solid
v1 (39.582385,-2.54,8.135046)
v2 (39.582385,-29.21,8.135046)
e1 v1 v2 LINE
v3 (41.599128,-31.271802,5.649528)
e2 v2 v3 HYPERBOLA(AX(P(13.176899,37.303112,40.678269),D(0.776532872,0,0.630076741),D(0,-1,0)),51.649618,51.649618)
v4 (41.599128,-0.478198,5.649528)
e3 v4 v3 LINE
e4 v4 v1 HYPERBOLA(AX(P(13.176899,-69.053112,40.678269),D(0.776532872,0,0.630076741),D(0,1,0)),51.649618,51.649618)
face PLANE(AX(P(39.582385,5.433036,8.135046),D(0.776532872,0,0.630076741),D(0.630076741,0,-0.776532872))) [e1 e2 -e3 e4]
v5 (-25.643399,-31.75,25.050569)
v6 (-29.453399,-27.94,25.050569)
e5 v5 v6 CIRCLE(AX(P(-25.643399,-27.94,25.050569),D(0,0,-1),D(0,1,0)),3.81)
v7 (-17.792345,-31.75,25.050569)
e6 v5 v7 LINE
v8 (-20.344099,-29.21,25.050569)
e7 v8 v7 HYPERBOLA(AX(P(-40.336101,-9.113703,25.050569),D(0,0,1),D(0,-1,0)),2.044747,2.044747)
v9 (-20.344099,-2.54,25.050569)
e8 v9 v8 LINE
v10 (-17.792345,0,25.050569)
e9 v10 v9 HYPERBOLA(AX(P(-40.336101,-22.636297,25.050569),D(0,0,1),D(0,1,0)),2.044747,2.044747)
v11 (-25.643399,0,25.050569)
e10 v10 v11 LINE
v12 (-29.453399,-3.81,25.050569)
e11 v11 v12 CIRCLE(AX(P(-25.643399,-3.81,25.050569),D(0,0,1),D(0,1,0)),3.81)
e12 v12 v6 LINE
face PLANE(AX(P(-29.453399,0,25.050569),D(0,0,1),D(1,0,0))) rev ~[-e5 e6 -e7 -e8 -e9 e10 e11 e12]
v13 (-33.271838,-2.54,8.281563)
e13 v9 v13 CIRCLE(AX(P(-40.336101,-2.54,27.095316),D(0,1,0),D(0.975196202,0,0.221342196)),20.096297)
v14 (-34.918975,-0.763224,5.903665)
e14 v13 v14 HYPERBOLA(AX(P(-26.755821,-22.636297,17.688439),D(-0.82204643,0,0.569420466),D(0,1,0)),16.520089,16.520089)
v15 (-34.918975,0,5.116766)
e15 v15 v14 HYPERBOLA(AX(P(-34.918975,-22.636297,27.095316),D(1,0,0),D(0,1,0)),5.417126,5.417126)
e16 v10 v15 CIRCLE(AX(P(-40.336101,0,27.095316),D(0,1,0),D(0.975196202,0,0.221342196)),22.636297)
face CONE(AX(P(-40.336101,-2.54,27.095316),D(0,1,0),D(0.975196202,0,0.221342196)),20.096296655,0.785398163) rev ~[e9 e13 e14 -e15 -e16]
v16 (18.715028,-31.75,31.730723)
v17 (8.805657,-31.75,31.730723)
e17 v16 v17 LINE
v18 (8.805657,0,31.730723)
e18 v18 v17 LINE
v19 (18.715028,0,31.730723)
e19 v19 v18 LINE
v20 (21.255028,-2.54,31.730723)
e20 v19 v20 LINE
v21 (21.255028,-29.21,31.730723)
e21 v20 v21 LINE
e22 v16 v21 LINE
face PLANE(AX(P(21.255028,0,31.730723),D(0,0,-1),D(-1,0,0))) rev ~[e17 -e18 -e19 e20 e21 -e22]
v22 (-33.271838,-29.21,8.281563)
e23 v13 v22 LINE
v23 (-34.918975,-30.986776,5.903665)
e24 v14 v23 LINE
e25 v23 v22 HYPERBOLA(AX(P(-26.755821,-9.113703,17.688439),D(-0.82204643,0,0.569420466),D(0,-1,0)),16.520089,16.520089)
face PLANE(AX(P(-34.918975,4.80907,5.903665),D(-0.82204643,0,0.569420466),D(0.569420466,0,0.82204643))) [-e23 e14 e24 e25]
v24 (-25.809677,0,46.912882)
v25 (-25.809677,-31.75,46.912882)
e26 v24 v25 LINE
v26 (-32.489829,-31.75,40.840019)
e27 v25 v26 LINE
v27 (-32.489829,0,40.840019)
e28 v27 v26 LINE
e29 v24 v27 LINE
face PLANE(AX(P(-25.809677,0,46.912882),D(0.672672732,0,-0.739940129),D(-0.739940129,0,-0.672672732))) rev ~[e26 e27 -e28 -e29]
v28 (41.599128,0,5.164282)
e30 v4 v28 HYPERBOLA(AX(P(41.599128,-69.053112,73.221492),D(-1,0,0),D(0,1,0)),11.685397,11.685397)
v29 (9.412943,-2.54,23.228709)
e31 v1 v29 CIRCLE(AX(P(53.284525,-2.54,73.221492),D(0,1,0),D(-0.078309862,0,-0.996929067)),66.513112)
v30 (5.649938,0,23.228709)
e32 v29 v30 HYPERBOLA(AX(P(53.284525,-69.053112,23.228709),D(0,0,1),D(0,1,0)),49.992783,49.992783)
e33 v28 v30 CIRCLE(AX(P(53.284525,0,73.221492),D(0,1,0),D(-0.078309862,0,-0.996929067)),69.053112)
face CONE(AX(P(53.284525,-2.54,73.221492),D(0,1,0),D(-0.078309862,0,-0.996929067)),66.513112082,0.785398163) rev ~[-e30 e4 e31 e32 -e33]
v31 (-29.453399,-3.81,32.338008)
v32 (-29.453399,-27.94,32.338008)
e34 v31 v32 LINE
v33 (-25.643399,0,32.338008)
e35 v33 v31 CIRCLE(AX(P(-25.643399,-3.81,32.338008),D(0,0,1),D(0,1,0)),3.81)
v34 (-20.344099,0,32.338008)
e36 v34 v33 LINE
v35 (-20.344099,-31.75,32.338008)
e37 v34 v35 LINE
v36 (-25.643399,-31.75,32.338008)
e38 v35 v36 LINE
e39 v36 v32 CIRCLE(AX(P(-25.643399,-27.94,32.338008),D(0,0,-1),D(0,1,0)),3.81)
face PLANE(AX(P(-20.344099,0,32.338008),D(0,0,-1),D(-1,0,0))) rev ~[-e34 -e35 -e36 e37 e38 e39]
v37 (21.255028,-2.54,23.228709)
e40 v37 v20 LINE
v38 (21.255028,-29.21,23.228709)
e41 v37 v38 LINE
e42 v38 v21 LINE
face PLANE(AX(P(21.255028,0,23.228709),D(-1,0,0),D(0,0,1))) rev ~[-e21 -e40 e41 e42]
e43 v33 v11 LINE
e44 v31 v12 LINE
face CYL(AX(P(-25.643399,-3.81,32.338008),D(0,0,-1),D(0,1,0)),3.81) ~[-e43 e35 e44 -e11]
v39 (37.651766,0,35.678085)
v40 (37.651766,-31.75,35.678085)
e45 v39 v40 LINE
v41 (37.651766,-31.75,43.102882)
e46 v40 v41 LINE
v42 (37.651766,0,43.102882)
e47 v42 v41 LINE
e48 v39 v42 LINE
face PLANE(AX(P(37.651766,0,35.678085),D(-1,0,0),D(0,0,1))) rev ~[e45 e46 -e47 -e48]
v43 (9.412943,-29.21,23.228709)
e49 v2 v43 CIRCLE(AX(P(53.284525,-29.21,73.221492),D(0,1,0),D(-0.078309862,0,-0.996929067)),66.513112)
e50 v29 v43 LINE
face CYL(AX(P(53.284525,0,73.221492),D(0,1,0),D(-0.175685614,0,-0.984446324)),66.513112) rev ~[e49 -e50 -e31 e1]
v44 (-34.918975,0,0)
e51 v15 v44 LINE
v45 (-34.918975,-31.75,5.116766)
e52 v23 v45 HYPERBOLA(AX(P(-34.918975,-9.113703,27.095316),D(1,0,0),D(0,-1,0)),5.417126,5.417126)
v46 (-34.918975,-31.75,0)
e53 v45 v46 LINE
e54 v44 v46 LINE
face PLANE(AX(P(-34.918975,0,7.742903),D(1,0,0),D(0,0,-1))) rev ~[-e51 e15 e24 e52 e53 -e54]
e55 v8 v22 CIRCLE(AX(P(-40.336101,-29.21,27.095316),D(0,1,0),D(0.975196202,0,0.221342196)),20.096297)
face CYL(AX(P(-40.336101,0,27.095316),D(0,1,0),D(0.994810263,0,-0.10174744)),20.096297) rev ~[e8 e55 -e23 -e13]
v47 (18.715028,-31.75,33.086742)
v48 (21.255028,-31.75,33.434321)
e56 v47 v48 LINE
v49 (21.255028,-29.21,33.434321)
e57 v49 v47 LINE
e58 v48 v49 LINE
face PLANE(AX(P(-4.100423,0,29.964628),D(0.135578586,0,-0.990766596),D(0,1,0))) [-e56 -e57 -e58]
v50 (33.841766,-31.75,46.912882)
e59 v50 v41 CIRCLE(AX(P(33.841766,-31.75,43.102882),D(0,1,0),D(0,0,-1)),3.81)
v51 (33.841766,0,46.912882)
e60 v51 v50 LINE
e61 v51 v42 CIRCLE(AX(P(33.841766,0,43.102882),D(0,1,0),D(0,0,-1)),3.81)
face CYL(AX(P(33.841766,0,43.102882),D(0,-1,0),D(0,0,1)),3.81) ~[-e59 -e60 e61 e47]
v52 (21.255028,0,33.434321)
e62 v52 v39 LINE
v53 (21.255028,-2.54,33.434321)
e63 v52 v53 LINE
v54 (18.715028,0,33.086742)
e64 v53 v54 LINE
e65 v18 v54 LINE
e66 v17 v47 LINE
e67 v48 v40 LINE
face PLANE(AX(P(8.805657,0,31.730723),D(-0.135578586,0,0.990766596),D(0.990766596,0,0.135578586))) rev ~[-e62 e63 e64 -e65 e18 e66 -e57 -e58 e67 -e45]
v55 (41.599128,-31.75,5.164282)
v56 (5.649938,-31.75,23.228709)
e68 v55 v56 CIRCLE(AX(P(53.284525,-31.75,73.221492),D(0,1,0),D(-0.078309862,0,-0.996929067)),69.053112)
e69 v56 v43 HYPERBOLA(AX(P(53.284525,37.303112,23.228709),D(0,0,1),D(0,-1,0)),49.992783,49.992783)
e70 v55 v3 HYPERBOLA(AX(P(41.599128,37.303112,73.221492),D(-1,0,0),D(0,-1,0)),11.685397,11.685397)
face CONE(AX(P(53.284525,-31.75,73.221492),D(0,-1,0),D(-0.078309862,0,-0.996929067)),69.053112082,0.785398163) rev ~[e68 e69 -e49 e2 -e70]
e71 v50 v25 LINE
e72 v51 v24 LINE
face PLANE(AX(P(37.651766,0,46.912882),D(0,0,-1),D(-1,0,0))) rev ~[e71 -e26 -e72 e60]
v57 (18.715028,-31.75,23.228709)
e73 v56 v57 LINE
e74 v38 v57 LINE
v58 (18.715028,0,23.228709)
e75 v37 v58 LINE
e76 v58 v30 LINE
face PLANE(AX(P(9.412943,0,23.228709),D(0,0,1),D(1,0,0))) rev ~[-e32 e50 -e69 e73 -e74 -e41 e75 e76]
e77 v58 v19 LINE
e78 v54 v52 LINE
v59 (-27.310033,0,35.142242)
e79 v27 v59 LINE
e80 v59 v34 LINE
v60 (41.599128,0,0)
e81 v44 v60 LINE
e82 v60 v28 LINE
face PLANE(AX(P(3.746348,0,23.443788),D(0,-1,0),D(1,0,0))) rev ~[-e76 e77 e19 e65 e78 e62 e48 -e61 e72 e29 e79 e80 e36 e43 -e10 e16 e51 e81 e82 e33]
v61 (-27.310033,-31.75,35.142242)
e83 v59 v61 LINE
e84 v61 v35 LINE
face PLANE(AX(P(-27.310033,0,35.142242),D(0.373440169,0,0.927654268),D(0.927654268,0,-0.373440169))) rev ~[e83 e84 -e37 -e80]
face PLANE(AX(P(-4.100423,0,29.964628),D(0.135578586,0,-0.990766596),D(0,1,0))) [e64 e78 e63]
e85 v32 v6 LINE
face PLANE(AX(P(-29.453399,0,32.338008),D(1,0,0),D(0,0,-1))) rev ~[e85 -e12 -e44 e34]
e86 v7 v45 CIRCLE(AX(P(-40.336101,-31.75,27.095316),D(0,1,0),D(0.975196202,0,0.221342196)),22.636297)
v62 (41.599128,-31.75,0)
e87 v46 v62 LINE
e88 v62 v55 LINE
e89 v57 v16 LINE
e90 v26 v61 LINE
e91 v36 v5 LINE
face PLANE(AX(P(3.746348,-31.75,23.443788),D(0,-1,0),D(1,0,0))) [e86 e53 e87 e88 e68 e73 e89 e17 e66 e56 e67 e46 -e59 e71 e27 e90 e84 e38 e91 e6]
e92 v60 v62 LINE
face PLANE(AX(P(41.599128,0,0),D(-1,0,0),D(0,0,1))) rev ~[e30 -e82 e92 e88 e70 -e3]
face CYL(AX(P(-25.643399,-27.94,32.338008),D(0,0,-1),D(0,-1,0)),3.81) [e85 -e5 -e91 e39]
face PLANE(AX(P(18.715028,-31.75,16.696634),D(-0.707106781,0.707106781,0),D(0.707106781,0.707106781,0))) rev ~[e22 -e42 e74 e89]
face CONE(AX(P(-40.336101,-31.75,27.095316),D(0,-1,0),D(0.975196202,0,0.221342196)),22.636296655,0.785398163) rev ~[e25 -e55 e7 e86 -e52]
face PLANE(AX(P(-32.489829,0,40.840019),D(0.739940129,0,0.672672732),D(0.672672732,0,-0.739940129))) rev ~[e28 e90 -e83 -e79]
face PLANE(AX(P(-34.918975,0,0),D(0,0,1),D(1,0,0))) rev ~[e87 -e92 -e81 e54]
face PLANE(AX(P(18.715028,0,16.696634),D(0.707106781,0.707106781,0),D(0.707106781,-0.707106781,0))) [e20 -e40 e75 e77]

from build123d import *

# Parameters (mm, degrees)
F1_DEPTH     = 31.75
F2_T1_DEPTH  = 42.6160723951
F2_T3_DEPTH  = 41.3681408406
F2_T8_ANGLE  = 42.4045514756
F2_T13_ANGLE = 42.4045514756
F2_T18_ANGLE = 105.7775701063
F2_T23_ANGLE = 105.7775701063
F2_T28_DEPTH = 21.5661635602
F2_T33_DEPTH = 21.5661635602
F3_R         = 3.81


# Not quite as in the source:
# - a fillet or chamfer that OpenCascade refuses, or shapes differently, is made with other operations: its cross-section is extruded or revolved along the edge and cut away or added


with BuildPart() as f1:
    # F0 (on Front) → F1 (new body)
    with BuildSketch(Plane.XZ):
        with BuildLine():
            Line((-34.918975085, 0), (0, 0))
            Line((0, 0), (41.5991283953, 0))
            Line((41.5991283953, 0), (41.5991283953, 7.7429031953))
            ThreePointArc((41.5991283953, 7.7429031953), (24.4471014125, 13.2848832085), (9.4129433855, 23.2287086546))
            Line((9.4129433855, 23.2287086546), (21.2550275028, 23.2287086546))
            Line((21.2550275028, 23.2287086546), (21.2550275028, 31.730722636))
            Line((21.2550275028, 31.730722636), (8.8056568056, 31.730722636))
            Line((8.8056568056, 31.730722636), (37.6517660916, 35.6780849397))
            Line((37.6517660916, 35.6780849397), (37.6517660916, 46.912882477))
            Line((37.6517660916, 46.912882477), (-25.8096773177, 46.912882477))
            Line((-25.8096773177, 46.912882477), (-32.4898287654, 40.8400185406))
            Line((-32.4898287654, 40.8400185406), (-27.3100329334, 35.1422421722))
            Line((-27.3100329334, 35.1422421722), (-20.3440990299, 32.3380082846))
            Line((-20.3440990299, 32.3380082846), (-29.4533986598, 32.3380082846))
            Line((-29.4533986598, 32.3380082846), (-29.4533986598, 25.0505693257))
            Line((-29.4533986598, 25.0505693257), (-20.3440990299, 25.0505693257))
            ThreePointArc((-20.3440990299, 25.0505693257), (-24.9642185282, 14.1505733942), (-34.918975085, 7.7429031953))
            Line((-34.918975085, 7.7429031953), (-34.918975085, 0))
        make_face()
    extrude(amount=F1_DEPTH)

    # F2: chamfer of 2.54 on 8 edges, made by hand

    # F2_s2 → F2_t1 (cut)
    with BuildSketch(Plane.XZ.offset(-5.4330361975)):
        with BuildLine():
            Line((39.5823851634, 8.1350460371), (41.5991283953, 5.6495275088))
            Line((41.5991283953, 5.6495275088), (41.5991283953, 7.7429031953))
            ThreePointArc((41.5991283953, 7.7429031953), (40.55098868, 7.9386371476), (39.5823851634, 8.1350460371))
        make_face()
    extrude(amount=F2_T1_DEPTH, mode=Mode.SUBTRACT)

    # F2_s4 → F2_t3 (cut)
    with BuildSketch(Plane.XZ.offset(-4.8090704203)):
        with BuildLine():
            Line((-34.918975085, 5.9036651076), (-33.2718375789, 8.2815626174))
            ThreePointArc((-33.2718375789, 8.2815626174), (-34.0510462722, 8.0071201362), (-34.918975085, 7.7429031953))
            Line((-34.918975085, 7.7429031953), (-34.918975085, 5.9036651076))
        make_face()
    extrude(amount=F2_T3_DEPTH, mode=Mode.SUBTRACT)


with BuildPart() as f2_tool6:
    # F2_s7 → F2_t8 (revolve)
    with BuildSketch(Plane(origin=(47.2414051796, 0, -3.7108637316), x_dir=(0, 1, 0), z_dir=(0.9969290674, 0, -0.078309862))):
        Polygon((-31.75, 8.1162253666), (-29.21, 10.6562253666), (-31.75, 10.6562253666), align=None)
    revolve(axis=Axis((53.2845253443, -31.75, 73.221491886), (0, 1, 0)), revolution_arc=F2_T8_ANGLE)

    split(bisect_by=Plane.XY.offset(23.2287086546), keep=Keep.BOTTOM)


with BuildPart() as f1_1:
    add(f1.part)

    # F2_t5: cut F2_tool6
    add(f2_tool6.part, mode=Mode.SUBTRACT)


with BuildPart() as f2_tool11:
    # F2_s12 → F2_t13 (revolve)
    with BuildSketch(Plane(origin=(47.2414051796, 0, -3.7108637316), x_dir=(0, 1, 0), z_dir=(0.9969290674, 0, -0.078309862))):
        Polygon((-2.54, 10.6562253666), (0, 8.1162253666), (0, 10.6562253666), align=None)
    revolve(axis=Axis((53.2845253443, 0, 73.221491886), (0, 1, 0)), revolution_arc=F2_T13_ANGLE)

    split(bisect_by=Plane.XY.offset(23.2287086546), keep=Keep.BOTTOM)


with BuildPart() as f1_2:
    add(f1_1.part)

    # F2_t10: cut F2_tool11
    add(f2_tool11.part, mode=Mode.SUBTRACT)


with BuildPart() as f2_tool16:
    # F2_s17 → F2_t18 (revolve)
    with BuildSketch(Plane(origin=(-7.8247411196, 0, 34.4744832645), x_dir=(0, 1, 0), z_dir=(-0.2213421957, 0, 0.975196202))):
        Polygon((-31.75, 10.7019792675), (-29.21, 13.2419792675), (-31.75, 13.2419792675), align=None)
    revolve(axis=Axis((-40.3361011805, -31.75, 27.0953160709), (0, 1, 0)), revolution_arc=F2_T18_ANGLE)

    split(bisect_by=Plane.XY.offset(25.0505693257), keep=Keep.BOTTOM)


with BuildPart() as f1_3:
    add(f1_2.part)

    # F2_t15: cut F2_tool16
    add(f2_tool16.part, mode=Mode.SUBTRACT)


with BuildPart() as f2_tool21:
    # F2_s22 → F2_t23 (revolve)
    with BuildSketch(Plane(origin=(-7.8247411196, 0, 34.4744832645), x_dir=(0, 1, 0), z_dir=(-0.2213421957, 0, 0.975196202))):
        Polygon((-2.54, 13.2419792675), (0, 10.7019792675), (0, 13.2419792675), align=None)
    revolve(axis=Axis((-40.3361011805, 0, 27.0953160709), (0, 1, 0)), revolution_arc=F2_T23_ANGLE)

    split(bisect_by=Plane.XY.offset(25.0505693257), keep=Keep.BOTTOM)


with BuildPart() as f1_4:
    add(f1_3.part)

    # F2_t20: cut F2_tool21
    add(f2_tool21.part, mode=Mode.SUBTRACT)


with BuildPart() as f2_tool26:
    # F2_s27 → F2_t28 (new body)
    with BuildSketch(Plane.XY.offset(16.6966338652)):
        Polygon((18.7150275028, 0), (21.2550275028, -2.54), (21.2550275028, 0), align=None)
    extrude(amount=F2_T28_DEPTH)

    split(bisect_by=Plane(origin=(-4.1004226977, 0, 29.9646275548), x_dir=(0, 1, 0), z_dir=(0.1355785861, 0, -0.9907665956)), keep=Keep.TOP)


with BuildPart() as f1_5:
    add(f1_4.part)

    # F2_t25: cut F2_tool26
    add(f2_tool26.part, mode=Mode.SUBTRACT)


with BuildPart() as f2_tool31:
    # F2_s32 → F2_t33 (new body)
    with BuildSketch(Plane.XY.offset(16.6966338652)):
        Polygon((18.7150275028, -31.75), (21.2550275028, -29.21), (21.2550275028, -31.75), align=None)
    extrude(amount=F2_T33_DEPTH)

    split(bisect_by=Plane(origin=(-4.1004226977, 0, 29.9646275548), x_dir=(0, 1, 0), z_dir=(0.1355785861, 0, -0.9907665956)), keep=Keep.TOP)


with BuildPart() as f1_6:
    add(f1_5.part)

    # F2_t30: cut F2_tool31
    add(f2_tool31.part, mode=Mode.SUBTRACT)

    # F3
    f3_edges = [f1_6.edges().sort_by_distance(p)[0] for p in [
        (-29.453399, -31.75, 28.694289),
        (-29.453399, 0, 28.694289),
        (37.651766, -15.875, 46.912882),
    ]]
    fillet(f3_edges, radius=F3_R)


solid = f1_6.part
